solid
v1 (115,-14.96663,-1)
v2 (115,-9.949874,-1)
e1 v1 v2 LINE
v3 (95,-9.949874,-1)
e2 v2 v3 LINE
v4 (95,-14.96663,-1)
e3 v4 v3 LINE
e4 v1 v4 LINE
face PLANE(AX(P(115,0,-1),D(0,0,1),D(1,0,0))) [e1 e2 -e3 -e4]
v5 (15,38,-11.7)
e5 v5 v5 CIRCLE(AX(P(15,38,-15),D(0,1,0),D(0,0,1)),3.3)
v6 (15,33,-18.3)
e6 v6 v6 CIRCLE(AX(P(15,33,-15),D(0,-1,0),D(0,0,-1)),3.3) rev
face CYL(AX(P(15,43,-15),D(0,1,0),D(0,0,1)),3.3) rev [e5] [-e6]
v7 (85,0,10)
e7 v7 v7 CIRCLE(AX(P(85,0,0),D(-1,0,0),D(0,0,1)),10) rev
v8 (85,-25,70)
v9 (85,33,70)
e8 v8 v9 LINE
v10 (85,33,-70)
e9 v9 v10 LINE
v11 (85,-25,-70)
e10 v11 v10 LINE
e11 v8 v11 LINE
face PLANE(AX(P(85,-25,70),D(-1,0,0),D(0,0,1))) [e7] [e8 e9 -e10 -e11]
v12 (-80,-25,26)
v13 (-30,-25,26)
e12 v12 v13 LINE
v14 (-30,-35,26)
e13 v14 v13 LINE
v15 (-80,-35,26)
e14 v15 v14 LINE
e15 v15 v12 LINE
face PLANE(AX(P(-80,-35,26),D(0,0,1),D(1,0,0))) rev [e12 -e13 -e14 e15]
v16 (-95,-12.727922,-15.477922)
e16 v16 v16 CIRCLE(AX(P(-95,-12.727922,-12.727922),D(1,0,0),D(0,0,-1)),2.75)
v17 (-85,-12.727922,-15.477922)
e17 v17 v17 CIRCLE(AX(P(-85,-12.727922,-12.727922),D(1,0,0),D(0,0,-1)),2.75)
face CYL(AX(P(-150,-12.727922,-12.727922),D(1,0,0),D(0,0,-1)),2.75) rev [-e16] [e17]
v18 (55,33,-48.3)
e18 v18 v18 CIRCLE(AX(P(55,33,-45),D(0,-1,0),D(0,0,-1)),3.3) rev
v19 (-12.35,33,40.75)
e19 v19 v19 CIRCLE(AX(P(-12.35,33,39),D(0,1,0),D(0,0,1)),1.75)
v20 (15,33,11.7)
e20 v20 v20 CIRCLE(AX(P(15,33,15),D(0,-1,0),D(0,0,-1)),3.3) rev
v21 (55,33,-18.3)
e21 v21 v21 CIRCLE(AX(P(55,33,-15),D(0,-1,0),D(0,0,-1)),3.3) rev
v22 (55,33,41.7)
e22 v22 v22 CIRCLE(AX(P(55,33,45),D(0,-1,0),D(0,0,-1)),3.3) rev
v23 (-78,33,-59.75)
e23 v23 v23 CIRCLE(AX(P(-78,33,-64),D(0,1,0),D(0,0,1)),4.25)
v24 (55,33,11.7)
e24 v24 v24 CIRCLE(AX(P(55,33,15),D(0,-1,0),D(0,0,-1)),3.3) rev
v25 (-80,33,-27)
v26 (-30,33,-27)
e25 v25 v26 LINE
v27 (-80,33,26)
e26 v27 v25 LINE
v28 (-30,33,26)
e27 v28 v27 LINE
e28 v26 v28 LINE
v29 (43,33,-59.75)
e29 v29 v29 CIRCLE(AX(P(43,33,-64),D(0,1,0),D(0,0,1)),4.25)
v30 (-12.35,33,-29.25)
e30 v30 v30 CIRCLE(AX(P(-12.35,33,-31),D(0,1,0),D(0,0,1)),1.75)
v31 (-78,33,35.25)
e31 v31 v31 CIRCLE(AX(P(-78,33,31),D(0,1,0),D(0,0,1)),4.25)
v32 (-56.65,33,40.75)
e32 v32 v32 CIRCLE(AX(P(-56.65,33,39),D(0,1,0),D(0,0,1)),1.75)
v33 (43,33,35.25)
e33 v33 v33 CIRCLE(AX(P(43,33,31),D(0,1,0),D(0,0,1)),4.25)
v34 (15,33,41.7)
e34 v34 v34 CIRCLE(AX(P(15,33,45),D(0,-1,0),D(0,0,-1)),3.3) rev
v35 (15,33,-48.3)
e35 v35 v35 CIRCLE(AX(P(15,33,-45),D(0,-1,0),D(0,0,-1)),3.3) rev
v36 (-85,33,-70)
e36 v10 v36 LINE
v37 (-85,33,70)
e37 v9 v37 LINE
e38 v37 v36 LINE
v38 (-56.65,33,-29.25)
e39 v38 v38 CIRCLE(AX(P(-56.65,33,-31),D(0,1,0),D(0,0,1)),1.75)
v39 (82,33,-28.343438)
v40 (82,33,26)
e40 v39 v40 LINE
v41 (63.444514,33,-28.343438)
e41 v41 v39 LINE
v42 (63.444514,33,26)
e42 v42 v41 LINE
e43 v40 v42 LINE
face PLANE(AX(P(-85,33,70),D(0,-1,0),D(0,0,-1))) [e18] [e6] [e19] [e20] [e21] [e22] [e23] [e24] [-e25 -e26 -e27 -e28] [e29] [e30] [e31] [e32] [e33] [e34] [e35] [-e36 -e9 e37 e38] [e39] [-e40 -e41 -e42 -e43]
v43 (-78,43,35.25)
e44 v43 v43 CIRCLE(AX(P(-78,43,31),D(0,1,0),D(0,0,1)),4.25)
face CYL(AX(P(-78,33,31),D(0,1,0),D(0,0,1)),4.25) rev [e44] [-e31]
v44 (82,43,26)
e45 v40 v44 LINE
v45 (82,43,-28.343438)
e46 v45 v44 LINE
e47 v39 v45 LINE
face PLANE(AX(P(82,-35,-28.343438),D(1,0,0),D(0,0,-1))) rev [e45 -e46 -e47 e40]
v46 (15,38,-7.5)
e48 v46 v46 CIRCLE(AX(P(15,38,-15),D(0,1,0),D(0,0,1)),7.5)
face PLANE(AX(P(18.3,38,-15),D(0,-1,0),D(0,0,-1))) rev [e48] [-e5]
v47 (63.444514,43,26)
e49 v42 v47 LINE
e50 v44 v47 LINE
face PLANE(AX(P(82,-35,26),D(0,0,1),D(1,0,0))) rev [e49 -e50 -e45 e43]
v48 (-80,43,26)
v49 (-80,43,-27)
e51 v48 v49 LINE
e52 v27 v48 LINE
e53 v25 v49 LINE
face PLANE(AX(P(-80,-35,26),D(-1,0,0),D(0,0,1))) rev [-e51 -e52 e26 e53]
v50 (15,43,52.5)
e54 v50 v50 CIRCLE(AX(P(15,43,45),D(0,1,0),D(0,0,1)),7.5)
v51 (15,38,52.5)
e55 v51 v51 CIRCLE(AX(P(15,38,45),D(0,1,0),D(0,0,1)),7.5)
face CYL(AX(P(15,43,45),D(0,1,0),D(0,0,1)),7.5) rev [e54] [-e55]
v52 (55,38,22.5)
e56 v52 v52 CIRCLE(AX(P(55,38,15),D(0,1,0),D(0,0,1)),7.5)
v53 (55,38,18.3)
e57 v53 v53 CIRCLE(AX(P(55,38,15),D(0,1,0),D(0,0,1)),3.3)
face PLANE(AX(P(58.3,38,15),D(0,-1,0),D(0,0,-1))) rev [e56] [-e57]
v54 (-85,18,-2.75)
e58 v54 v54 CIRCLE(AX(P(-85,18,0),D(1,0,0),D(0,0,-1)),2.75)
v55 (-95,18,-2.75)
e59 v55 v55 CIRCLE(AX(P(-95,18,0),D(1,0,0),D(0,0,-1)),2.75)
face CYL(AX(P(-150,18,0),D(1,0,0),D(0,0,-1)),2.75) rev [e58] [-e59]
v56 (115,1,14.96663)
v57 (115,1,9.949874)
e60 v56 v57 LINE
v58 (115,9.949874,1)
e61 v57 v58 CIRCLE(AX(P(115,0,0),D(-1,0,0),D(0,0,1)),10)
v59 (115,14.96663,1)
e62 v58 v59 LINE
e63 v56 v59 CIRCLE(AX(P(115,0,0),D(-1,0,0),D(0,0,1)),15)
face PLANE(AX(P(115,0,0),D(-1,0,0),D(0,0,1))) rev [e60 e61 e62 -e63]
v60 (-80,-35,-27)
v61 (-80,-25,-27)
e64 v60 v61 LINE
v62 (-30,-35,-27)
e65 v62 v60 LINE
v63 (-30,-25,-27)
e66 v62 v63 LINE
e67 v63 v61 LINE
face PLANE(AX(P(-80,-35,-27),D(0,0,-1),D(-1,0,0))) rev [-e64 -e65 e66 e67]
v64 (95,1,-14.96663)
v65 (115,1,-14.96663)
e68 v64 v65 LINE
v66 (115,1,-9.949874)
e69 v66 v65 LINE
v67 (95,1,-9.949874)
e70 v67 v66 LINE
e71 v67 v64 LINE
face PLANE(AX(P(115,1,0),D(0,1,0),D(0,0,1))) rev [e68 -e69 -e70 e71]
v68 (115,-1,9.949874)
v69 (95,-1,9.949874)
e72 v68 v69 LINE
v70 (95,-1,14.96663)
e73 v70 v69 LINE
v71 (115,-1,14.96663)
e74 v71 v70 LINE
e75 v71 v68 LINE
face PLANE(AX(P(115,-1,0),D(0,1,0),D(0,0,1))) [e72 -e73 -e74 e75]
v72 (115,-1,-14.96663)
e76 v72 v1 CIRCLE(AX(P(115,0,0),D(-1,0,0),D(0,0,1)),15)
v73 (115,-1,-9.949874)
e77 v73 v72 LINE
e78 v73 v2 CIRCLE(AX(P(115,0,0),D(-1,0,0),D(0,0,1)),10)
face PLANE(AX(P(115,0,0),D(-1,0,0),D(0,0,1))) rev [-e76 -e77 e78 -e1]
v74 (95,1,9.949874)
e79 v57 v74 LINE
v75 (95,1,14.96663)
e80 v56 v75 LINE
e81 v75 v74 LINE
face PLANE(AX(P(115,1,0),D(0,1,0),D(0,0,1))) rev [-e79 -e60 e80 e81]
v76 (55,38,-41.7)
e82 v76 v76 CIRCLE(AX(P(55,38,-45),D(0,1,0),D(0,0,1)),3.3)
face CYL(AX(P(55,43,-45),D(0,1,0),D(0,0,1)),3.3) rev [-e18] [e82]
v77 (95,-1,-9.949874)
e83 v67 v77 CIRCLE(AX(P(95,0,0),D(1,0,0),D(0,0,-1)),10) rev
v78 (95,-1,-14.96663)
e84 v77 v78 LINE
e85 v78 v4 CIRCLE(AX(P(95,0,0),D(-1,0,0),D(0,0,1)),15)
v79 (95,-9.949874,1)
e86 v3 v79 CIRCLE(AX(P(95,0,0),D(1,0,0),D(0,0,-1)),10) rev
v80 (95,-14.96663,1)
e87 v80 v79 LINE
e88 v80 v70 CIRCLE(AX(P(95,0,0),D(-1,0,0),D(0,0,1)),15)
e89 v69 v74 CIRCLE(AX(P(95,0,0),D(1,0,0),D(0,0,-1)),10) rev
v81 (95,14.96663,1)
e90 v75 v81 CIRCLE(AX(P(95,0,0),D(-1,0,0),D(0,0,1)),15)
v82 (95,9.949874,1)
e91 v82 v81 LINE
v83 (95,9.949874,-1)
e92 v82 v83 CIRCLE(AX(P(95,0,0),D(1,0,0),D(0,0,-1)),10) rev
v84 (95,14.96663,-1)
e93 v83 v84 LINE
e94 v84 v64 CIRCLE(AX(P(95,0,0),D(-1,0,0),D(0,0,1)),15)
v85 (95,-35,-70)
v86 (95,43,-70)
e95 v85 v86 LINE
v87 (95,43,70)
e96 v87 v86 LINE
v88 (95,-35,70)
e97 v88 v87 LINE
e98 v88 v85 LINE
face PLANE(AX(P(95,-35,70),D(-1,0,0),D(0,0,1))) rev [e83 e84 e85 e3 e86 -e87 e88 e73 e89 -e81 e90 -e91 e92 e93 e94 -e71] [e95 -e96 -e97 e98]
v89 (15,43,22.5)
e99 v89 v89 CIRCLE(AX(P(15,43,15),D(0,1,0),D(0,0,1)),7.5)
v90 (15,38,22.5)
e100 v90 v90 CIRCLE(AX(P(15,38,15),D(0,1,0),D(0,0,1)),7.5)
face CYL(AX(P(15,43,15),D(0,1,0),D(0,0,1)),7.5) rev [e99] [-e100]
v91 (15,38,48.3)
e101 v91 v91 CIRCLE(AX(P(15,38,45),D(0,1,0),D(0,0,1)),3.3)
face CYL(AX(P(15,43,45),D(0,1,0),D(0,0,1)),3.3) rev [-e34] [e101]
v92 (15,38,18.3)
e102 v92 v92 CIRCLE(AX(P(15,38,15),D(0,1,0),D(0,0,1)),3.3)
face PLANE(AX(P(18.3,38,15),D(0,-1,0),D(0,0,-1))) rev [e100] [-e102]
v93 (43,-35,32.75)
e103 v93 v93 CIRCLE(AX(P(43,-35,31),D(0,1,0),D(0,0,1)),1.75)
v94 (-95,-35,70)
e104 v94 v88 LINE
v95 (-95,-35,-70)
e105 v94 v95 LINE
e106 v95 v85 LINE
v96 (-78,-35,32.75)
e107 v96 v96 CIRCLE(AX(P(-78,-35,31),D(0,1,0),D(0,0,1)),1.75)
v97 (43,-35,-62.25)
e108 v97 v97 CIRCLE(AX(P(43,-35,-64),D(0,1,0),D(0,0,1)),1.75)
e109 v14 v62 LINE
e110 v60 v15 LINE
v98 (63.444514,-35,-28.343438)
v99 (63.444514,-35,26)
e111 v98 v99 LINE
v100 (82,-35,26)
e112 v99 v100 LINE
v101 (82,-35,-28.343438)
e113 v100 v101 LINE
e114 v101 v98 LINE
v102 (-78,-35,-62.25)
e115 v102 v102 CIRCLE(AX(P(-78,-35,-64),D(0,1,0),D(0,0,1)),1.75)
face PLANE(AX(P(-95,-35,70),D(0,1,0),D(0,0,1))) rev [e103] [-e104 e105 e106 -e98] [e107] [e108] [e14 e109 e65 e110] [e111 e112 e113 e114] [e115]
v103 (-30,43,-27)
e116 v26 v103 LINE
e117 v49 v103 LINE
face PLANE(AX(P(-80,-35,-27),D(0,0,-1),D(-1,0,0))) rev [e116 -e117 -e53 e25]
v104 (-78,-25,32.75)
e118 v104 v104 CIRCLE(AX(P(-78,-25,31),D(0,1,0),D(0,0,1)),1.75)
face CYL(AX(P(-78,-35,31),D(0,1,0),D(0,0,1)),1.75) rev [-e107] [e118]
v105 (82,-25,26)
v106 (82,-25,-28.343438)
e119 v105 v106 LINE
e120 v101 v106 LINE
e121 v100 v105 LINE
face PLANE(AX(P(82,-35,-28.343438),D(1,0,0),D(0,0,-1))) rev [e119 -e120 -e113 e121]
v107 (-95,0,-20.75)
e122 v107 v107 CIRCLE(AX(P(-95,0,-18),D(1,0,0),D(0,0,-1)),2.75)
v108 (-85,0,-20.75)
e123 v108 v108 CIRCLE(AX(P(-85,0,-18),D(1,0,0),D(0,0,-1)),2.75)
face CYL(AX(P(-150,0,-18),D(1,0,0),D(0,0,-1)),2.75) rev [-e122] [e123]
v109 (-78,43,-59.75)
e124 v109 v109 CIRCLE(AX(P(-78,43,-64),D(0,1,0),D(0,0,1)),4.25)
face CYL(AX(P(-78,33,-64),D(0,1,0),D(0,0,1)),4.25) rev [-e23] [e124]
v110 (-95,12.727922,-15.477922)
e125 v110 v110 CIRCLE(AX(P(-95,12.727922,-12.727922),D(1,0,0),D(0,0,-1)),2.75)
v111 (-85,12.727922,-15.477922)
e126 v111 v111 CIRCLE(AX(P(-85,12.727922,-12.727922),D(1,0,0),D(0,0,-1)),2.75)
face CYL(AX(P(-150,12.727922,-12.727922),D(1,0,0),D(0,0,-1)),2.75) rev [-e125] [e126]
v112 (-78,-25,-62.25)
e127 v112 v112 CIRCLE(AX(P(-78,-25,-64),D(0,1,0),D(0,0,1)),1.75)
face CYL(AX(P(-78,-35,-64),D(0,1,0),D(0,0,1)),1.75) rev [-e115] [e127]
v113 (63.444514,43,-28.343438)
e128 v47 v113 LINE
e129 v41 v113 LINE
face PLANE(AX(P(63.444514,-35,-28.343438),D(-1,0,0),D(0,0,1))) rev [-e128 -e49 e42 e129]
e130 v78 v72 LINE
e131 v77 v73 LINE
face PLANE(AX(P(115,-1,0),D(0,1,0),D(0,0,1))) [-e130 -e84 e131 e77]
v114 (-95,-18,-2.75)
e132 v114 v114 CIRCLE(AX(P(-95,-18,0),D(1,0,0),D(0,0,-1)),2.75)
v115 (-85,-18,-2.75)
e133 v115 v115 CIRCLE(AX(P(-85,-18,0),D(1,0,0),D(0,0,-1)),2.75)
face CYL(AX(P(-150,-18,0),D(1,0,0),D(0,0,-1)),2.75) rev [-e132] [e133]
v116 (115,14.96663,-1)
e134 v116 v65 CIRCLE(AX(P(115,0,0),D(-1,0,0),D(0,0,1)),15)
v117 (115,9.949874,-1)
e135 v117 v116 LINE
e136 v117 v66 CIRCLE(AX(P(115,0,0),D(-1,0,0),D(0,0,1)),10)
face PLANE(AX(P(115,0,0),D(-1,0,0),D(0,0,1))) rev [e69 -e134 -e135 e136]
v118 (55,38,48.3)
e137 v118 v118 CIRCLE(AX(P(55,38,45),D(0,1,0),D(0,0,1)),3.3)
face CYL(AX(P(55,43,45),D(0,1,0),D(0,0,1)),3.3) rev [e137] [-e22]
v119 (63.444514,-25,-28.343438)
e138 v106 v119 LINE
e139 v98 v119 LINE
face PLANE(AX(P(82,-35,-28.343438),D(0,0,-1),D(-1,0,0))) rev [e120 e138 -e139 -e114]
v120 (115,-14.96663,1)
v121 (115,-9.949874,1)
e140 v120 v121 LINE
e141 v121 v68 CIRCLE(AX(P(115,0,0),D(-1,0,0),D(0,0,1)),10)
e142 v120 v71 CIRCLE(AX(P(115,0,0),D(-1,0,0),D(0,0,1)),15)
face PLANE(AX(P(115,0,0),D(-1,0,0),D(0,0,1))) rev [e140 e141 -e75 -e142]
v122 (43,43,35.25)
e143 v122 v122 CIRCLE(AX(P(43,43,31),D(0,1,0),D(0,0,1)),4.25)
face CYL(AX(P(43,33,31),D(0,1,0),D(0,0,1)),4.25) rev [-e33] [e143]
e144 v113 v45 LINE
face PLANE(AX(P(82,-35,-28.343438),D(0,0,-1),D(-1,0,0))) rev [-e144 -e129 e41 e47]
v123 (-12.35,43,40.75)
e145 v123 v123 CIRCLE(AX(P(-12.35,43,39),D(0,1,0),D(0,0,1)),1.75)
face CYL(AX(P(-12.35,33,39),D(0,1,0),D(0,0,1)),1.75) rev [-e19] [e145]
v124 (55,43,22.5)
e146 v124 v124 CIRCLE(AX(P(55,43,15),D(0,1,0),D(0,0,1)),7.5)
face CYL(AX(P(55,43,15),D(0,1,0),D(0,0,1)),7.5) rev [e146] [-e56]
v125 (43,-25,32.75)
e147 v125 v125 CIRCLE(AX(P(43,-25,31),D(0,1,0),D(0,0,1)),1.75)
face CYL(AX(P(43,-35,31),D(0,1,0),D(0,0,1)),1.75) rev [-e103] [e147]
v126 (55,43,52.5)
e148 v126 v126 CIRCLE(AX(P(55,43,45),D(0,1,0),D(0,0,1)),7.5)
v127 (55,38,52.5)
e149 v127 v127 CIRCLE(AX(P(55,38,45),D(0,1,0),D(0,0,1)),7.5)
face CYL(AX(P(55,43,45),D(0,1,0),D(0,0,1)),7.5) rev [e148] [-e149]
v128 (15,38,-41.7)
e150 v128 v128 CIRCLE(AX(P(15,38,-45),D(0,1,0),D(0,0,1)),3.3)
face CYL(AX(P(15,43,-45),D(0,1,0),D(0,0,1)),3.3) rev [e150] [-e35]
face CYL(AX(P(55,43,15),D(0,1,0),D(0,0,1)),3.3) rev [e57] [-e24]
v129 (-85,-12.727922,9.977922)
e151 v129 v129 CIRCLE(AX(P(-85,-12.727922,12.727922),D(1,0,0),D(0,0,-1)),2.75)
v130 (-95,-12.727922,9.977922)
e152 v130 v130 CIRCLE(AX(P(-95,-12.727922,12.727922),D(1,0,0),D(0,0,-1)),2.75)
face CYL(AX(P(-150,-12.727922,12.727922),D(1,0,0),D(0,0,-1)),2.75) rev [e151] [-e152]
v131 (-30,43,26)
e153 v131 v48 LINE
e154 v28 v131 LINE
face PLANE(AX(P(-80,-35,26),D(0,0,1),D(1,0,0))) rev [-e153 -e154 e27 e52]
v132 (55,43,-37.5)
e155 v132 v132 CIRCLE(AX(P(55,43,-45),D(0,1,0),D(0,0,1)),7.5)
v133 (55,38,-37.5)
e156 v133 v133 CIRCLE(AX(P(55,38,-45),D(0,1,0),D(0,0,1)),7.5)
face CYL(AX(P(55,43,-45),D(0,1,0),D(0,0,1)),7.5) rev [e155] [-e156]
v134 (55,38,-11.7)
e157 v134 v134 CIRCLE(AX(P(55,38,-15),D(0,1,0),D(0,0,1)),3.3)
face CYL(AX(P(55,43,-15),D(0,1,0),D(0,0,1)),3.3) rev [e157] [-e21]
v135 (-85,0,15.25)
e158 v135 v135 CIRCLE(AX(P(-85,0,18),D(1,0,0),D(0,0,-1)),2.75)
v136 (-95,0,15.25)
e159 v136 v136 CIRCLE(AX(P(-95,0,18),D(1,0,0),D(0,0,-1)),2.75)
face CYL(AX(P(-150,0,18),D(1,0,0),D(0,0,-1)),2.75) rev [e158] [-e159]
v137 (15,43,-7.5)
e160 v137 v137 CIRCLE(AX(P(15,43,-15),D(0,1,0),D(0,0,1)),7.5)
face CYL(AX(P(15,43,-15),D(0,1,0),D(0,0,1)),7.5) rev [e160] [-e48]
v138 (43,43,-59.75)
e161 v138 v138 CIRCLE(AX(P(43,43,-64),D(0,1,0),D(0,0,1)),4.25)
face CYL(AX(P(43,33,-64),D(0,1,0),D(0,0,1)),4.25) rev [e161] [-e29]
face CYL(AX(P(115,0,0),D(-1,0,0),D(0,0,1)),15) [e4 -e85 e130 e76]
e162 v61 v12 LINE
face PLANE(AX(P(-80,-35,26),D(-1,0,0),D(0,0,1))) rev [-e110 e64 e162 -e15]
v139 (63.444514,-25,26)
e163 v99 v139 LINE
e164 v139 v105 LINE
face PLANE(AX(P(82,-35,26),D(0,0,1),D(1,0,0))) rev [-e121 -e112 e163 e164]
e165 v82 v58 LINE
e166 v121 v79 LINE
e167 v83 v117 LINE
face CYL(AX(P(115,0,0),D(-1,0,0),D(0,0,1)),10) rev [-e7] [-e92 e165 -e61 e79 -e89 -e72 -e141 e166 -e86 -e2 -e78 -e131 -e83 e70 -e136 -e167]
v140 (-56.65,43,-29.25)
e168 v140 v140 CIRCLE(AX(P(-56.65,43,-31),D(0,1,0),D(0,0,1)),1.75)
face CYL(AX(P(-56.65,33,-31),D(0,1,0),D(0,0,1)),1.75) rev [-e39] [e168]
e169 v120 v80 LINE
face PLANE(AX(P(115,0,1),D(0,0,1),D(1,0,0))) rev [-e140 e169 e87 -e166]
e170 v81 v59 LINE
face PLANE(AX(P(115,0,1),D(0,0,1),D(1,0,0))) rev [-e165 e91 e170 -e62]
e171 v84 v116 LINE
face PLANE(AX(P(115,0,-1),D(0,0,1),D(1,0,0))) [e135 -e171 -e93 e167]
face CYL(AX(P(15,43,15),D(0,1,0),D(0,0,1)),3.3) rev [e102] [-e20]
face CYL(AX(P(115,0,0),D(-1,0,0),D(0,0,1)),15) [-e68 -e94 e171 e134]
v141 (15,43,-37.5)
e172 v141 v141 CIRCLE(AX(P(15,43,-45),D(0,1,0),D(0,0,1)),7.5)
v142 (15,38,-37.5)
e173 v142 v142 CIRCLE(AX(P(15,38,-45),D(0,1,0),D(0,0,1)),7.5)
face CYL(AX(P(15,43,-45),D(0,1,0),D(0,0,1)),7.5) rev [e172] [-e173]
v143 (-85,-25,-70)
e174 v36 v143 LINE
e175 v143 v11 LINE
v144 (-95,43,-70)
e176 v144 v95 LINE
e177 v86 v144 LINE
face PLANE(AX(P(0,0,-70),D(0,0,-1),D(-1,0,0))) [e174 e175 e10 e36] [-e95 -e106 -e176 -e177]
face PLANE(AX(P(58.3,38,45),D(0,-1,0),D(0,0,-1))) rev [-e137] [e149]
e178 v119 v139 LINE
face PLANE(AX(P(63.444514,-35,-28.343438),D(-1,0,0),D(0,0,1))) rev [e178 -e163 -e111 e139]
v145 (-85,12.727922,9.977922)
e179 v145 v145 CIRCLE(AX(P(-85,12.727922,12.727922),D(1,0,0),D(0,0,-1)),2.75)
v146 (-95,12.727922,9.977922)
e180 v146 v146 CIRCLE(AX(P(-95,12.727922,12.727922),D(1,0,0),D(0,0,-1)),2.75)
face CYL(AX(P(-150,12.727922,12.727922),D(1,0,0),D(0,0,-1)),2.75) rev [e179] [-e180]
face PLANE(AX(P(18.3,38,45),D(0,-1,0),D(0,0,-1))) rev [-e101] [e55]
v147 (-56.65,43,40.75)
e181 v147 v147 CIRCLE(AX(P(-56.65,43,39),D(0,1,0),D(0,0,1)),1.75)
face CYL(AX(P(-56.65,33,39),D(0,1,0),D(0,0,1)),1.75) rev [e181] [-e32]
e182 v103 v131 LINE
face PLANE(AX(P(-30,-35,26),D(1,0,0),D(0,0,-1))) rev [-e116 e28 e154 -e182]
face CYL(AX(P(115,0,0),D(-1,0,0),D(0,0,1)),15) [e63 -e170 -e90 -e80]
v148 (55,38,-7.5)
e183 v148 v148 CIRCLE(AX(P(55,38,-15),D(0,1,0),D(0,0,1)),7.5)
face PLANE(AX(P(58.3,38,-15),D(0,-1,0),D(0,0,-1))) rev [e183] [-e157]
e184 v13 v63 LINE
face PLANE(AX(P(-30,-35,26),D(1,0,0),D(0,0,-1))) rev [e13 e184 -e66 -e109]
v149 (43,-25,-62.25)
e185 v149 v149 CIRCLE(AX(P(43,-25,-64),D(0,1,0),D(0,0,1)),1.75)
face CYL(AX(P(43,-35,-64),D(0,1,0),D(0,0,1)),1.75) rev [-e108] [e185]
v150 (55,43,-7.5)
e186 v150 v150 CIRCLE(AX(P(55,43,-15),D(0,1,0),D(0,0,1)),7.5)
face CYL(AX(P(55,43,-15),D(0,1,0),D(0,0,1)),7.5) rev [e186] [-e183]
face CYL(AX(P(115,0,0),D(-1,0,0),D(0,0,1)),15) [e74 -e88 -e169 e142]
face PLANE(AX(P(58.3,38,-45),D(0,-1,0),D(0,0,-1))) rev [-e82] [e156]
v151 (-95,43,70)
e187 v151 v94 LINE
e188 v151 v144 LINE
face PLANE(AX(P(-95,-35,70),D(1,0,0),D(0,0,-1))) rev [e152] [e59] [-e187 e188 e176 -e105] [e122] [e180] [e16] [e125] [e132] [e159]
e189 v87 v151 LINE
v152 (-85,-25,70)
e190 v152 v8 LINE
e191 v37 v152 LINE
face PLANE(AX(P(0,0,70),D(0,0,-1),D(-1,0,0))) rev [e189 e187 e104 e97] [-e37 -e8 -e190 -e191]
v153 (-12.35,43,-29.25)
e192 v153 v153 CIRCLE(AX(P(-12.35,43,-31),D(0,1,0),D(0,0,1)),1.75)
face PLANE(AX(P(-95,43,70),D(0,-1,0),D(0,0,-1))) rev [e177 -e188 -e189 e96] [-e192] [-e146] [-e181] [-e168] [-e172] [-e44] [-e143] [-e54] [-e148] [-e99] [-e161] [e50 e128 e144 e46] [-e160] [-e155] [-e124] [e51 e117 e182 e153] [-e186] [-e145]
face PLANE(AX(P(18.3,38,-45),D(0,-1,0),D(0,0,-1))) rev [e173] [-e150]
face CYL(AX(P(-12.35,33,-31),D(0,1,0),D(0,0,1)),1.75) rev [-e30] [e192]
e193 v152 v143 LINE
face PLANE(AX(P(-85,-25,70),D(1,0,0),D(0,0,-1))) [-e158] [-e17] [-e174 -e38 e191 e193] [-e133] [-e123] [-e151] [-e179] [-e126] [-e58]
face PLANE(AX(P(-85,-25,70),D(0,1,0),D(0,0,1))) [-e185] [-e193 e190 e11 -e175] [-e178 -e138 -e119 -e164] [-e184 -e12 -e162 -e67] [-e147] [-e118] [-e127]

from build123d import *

# Parameters (mm, degrees)
SKETCH1_W                                 = 190
SKETCH1_H                                 = 78
SKETCH1_W_2                               = 170
SKETCH1_H_2                               = 58
BOSS_EXTRUDE1_DEPTH                       = 70
BOSS_EXTRUDE2_START                       = 95
SKETCH2_R                                 = 15
SKETCH2_R_2                               = 10
BOSS_EXTRUDE2_DEPTH                       = 20
SKETCH3_R                                 = 10
CUT_EXTRUDE1_DEPTH                        = 150
SKETCH4_R                                 = 2.75
CUT_EXTRUDE2_DEPTH                        = 150
CUT_EXTRUDE3_DEPTH                        = 208
SKETCH7_R                                 = 3.25
CUT_EXTRUDE4_DEPTH                        = 26
CBORE_START                               = 38
CBORE_FOR_M5_HEX_HEAD_BOLT1_OUTLINE_R     = 7.5
CBORE_FOR_M5_HEX_HEAD_BOLT1_OUTLINE_R_2   = 3.25
CBORE_FOR_M5_HEX_HEAD_BOLT1_DEPTH         = 5
CBORE_START_2                             = 33
CBORE_FOR_M5_HEX_HEAD_BOLT1_2_OUTLINE_R   = 3.3
CBORE_FOR_M5_HEX_HEAD_BOLT1_2_OUTLINE_R_2 = 3.25
CBORE_FOR_M5_HEX_HEAD_BOLT1_2_DEPTH       = 5
CUT_EXTRUDE5_DEPTH                        = 156.592416268
CUT_EXTRUDE5_DEPTH_BACK                   = 156.592416268
SKETCH10_W                                = 50
SKETCH10_H                                = 53
SKETCH10_W_2                              = 18.555485725
SKETCH10_H_2                              = 54.34343807
SKETCH11_R                                = 1.75
SKETCH11_R_2                              = 4.25
CUT_EXTRUDE6_DEPTH                        = 10
SKETCH12_R                                = 1.75
CUT_EXTRUDE7_DEPTH                        = 10


# Read off the part's stored shape, not the designer's step: CBORE for M5 Hex Head Bolt1
with BuildPart() as part:
    # Sketch1 → Boss-Extrude1 (new, symmetric)
    with BuildSketch(Plane.XY):
        with Locations((0, 4)):
            Rectangle(SKETCH1_W, SKETCH1_H)
        with Locations((0, 4)):
            Rectangle(SKETCH1_W_2, SKETCH1_H_2, mode=Mode.SUBTRACT)
    extrude(amount=BOSS_EXTRUDE1_DEPTH, both=True)

    # Sketch2 → Boss-Extrude2 (add)
    with BuildSketch(Plane(origin=(0, 0, 0), x_dir=(0, 0, -1), z_dir=(1, 0, 0)).offset(BOSS_EXTRUDE2_START)):
        with Locations(Location((0, 0, 0), (0, 0, 180))):
            Circle(SKETCH2_R)
        with Locations(Location((0, 0, 0), (0, 0, 180))):
            Circle(SKETCH2_R_2, mode=Mode.SUBTRACT)
    extrude(amount=BOSS_EXTRUDE2_DEPTH)

    # Sketch3 → Cut-Extrude1 (cut)
    with BuildSketch(Plane(origin=(0, 0, 0), x_dir=(0, 0, -1), z_dir=(1, 0, 0))):
        with Locations(Location((0, 0, 0), (0, 0, 180))):
            Circle(SKETCH3_R)
    extrude(amount=CUT_EXTRUDE1_DEPTH, mode=Mode.SUBTRACT)

    # Sketch4 → Cut-Extrude2 (cut)
    with BuildSketch(Plane(origin=(0, 0, 0), x_dir=(0, 0, -1), z_dir=(1, 0, 0))):
        with Locations((0, 18)):
            Circle(SKETCH4_R)
        with Locations((12.727922061, 12.727922061)):
            Circle(SKETCH4_R)
        with Locations((18, 0)):
            Circle(SKETCH4_R)
        with Locations((12.727922061, -12.727922061)):
            Circle(SKETCH4_R)
        with Locations((0, -18)):
            Circle(SKETCH4_R)
        with Locations((-12.727922061, -12.727922061)):
            Circle(SKETCH4_R)
        with Locations((-18, 0)):
            Circle(SKETCH4_R)
        with Locations((-12.727922061, 12.727922061)):
            Circle(SKETCH4_R)
    extrude(amount=-CUT_EXTRUDE2_DEPTH, mode=Mode.SUBTRACT)

    # Sketch5 → Cut-Extrude3 (cut, through all)
    with BuildSketch(Plane(origin=(95, 0, 0), x_dir=(0, 0, -1), z_dir=(1, 0, 0))):
        with BuildLine():
            ThreePointArc((15, 0), (14.991655066, -0.500278319), (14.966629547, -1))
            Line((14.966629547, -1), (20.919422727, -1))
            Line((20.919422727, -1), (20.919422727, 1))
            Line((20.919422727, 1), (14.966629547, 1))
            ThreePointArc((14.966629547, 1), (14.991655066, 0.500278319), (15, 0))
        make_face()
        with BuildLine():
            ThreePointArc((-14.966629547, 1), (-15, 0), (-14.966629547, -1))
            Line((-14.966629547, -1), (-1, -1))
            Line((-1, -1), (-1, 1))
            Line((-1, 1), (-14.966629547, 1))
        make_face()
        with BuildLine():
            Line((1, -1), (-1, -1))
            Line((-1, -1), (-1, -14.966629547))
            ThreePointArc((-1, -14.966629547), (0, -15), (1, -14.966629547))
            Line((1, -14.966629547), (1, -1))
        make_face()
        with BuildLine():
            Line((-1, 14.966629547), (-1, 1))
            Line((-1, 1), (1, 1))
            Line((1, 1), (1, 14.966629547))
            ThreePointArc((1, 14.966629547), (0, 15), (-1, 14.966629547))
        make_face()
        with BuildLine():
            Line((1, 1), (1, -1))
            Line((1, -1), (14.966629547, -1))
            ThreePointArc((14.966629547, -1), (14.991655066, -0.500278319), (15, 0))
            ThreePointArc((15, 0), (14.991655066, 0.500278319), (14.966629547, 1))
            Line((14.966629547, 1), (1, 1))
        make_face()
        with BuildLine():
            ThreePointArc((1, -14.966629547), (0, -15), (-1, -14.966629547))
            Line((-1, -14.966629547), (-1, -18.179329237))
            Line((-1, -18.179329237), (1, -18.179329237))
            Line((1, -18.179329237), (1, -14.966629547))
        make_face()
        with BuildLine():
            Line((-20.919422727, 1), (-20.919422727, -1))
            Line((-20.919422727, -1), (-14.966629547, -1))
            ThreePointArc((-14.966629547, -1), (-15, 0), (-14.966629547, 1))
            Line((-14.966629547, 1), (-20.919422727, 1))
        make_face()
        with BuildLine():
            Line((-1, 18.179329237), (-1, 14.966629547))
            ThreePointArc((-1, 14.966629547), (0, 15), (1, 14.966629547))
            Line((1, 14.966629547), (1, 18.179329237))
            Line((1, 18.179329237), (-1, 18.179329237))
        make_face()
    extrude(amount=CUT_EXTRUDE3_DEPTH, mode=Mode.SUBTRACT)

    # Sketch7 → Cut-Extrude4 (cut)
    with BuildSketch(Plane(origin=(0, 43, 0), x_dir=(1, 0, 0), z_dir=(0, 1, 0))):
        with Locations(Location((15, -45, 0), (0, 0, 270))):
            Circle(SKETCH7_R)
        with Locations(Location((55, -45, 0), (0, 0, 270))):
            Circle(SKETCH7_R)
        with Locations(Location((15, -15, 0), (0, 0, 270))):
            Circle(SKETCH7_R)
        with Locations(Location((55, -15, 0), (0, 0, 270))):
            Circle(SKETCH7_R)
        with Locations(Location((15, 15, 0), (0, 0, 270))):
            Circle(SKETCH7_R)
        with Locations(Location((55, 15, 0), (0, 0, 270))):
            Circle(SKETCH7_R)
        with Locations(Location((15, 45, 0), (0, 0, 270))):
            Circle(SKETCH7_R)
        with Locations(Location((55, 45, 0), (0, 0, 270))):
            Circle(SKETCH7_R)
    extrude(amount=-CUT_EXTRUDE4_DEPTH, mode=Mode.SUBTRACT)

    # CBORE for M5 Hex Head Bolt1 outline → CBORE for M5 Hex Head Bolt1 (cut)
    # profile 1 of 8: a face of its own
    with BuildSketch(Plane(origin=(0, 0, 0), x_dir=(1, 0, 0), z_dir=(0, 1, 0)).offset(CBORE_START)):
        with Locations((15, -15)):
            Circle(CBORE_FOR_M5_HEX_HEAD_BOLT1_OUTLINE_R)
        with Locations((15, -15)):
            Circle(CBORE_FOR_M5_HEX_HEAD_BOLT1_OUTLINE_R_2, mode=Mode.SUBTRACT)
    # profile 2 of 8: a face of its own
    with BuildSketch(Plane(origin=(0, 0, 0), x_dir=(1, 0, 0), z_dir=(0, 1, 0)).offset(CBORE_START)):
        with Locations((15, -45)):
            Circle(CBORE_FOR_M5_HEX_HEAD_BOLT1_OUTLINE_R)
        with Locations((15, -45)):
            Circle(CBORE_FOR_M5_HEX_HEAD_BOLT1_OUTLINE_R_2, mode=Mode.SUBTRACT)
    # profile 3 of 8: a face of its own
    with BuildSketch(Plane(origin=(0, 0, 0), x_dir=(1, 0, 0), z_dir=(0, 1, 0)).offset(CBORE_START)):
        with Locations((55, -45)):
            Circle(CBORE_FOR_M5_HEX_HEAD_BOLT1_OUTLINE_R)
        with Locations((55, -45)):
            Circle(CBORE_FOR_M5_HEX_HEAD_BOLT1_OUTLINE_R_2, mode=Mode.SUBTRACT)
    # profile 4 of 8: a face of its own
    with BuildSketch(Plane(origin=(0, 0, 0), x_dir=(1, 0, 0), z_dir=(0, 1, 0)).offset(CBORE_START)):
        with Locations((55, -15)):
            Circle(CBORE_FOR_M5_HEX_HEAD_BOLT1_OUTLINE_R)
        with Locations((55, -15)):
            Circle(CBORE_FOR_M5_HEX_HEAD_BOLT1_OUTLINE_R_2, mode=Mode.SUBTRACT)
    # profile 5 of 8: a face of its own
    with BuildSketch(Plane(origin=(0, 0, 0), x_dir=(1, 0, 0), z_dir=(0, 1, 0)).offset(CBORE_START)):
        with Locations((15, 15)):
            Circle(CBORE_FOR_M5_HEX_HEAD_BOLT1_OUTLINE_R)
        with Locations((15, 15)):
            Circle(CBORE_FOR_M5_HEX_HEAD_BOLT1_OUTLINE_R_2, mode=Mode.SUBTRACT)
    # profile 6 of 8: a face of its own
    with BuildSketch(Plane(origin=(0, 0, 0), x_dir=(1, 0, 0), z_dir=(0, 1, 0)).offset(CBORE_START)):
        with Locations((55, 15)):
            Circle(CBORE_FOR_M5_HEX_HEAD_BOLT1_OUTLINE_R)
        with Locations((55, 15)):
            Circle(CBORE_FOR_M5_HEX_HEAD_BOLT1_OUTLINE_R_2, mode=Mode.SUBTRACT)
    # profile 7 of 8: a face of its own
    with BuildSketch(Plane(origin=(0, 0, 0), x_dir=(1, 0, 0), z_dir=(0, 1, 0)).offset(CBORE_START)):
        with Locations((55, 45)):
            Circle(CBORE_FOR_M5_HEX_HEAD_BOLT1_OUTLINE_R)
        with Locations((55, 45)):
            Circle(CBORE_FOR_M5_HEX_HEAD_BOLT1_OUTLINE_R_2, mode=Mode.SUBTRACT)
    # profile 8 of 8: a face of its own
    with BuildSketch(Plane(origin=(0, 0, 0), x_dir=(1, 0, 0), z_dir=(0, 1, 0)).offset(CBORE_START)):
        with Locations((15, 45)):
            Circle(CBORE_FOR_M5_HEX_HEAD_BOLT1_OUTLINE_R)
        with Locations((15, 45)):
            Circle(CBORE_FOR_M5_HEX_HEAD_BOLT1_OUTLINE_R_2, mode=Mode.SUBTRACT)
    extrude(amount=CBORE_FOR_M5_HEX_HEAD_BOLT1_DEPTH, mode=Mode.SUBTRACT)

    # CBORE for M5 Hex Head Bolt1 2 outline → CBORE for M5 Hex Head Bolt1 2 (cut)
    # profile 1 of 8: a face of its own
    with BuildSketch(Plane(origin=(0, 0, 0), x_dir=(1, 0, 0), z_dir=(0, 1, 0)).offset(CBORE_START_2)):
        with Locations((15, -15)):
            Circle(CBORE_FOR_M5_HEX_HEAD_BOLT1_2_OUTLINE_R)
        with Locations((15, -15)):
            Circle(CBORE_FOR_M5_HEX_HEAD_BOLT1_2_OUTLINE_R_2, mode=Mode.SUBTRACT)
    # profile 2 of 8: a face of its own
    with BuildSketch(Plane(origin=(0, 0, 0), x_dir=(1, 0, 0), z_dir=(0, 1, 0)).offset(CBORE_START_2)):
        with Locations((15, -45)):
            Circle(CBORE_FOR_M5_HEX_HEAD_BOLT1_2_OUTLINE_R)
        with Locations((15, -45)):
            Circle(CBORE_FOR_M5_HEX_HEAD_BOLT1_2_OUTLINE_R_2, mode=Mode.SUBTRACT)
    # profile 3 of 8: a face of its own
    with BuildSketch(Plane(origin=(0, 0, 0), x_dir=(1, 0, 0), z_dir=(0, 1, 0)).offset(CBORE_START_2)):
        with Locations((55, -45)):
            Circle(CBORE_FOR_M5_HEX_HEAD_BOLT1_2_OUTLINE_R)
        with Locations((55, -45)):
            Circle(CBORE_FOR_M5_HEX_HEAD_BOLT1_2_OUTLINE_R_2, mode=Mode.SUBTRACT)
    # profile 4 of 8: a face of its own
    with BuildSketch(Plane(origin=(0, 0, 0), x_dir=(1, 0, 0), z_dir=(0, 1, 0)).offset(CBORE_START_2)):
        with Locations((55, -15)):
            Circle(CBORE_FOR_M5_HEX_HEAD_BOLT1_2_OUTLINE_R)
        with Locations((55, -15)):
            Circle(CBORE_FOR_M5_HEX_HEAD_BOLT1_2_OUTLINE_R_2, mode=Mode.SUBTRACT)
    # profile 5 of 8: a face of its own
    with BuildSketch(Plane(origin=(0, 0, 0), x_dir=(1, 0, 0), z_dir=(0, 1, 0)).offset(CBORE_START_2)):
        with Locations((15, 15)):
            Circle(CBORE_FOR_M5_HEX_HEAD_BOLT1_2_OUTLINE_R)
        with Locations((15, 15)):
            Circle(CBORE_FOR_M5_HEX_HEAD_BOLT1_2_OUTLINE_R_2, mode=Mode.SUBTRACT)
    # profile 6 of 8: a face of its own
    with BuildSketch(Plane(origin=(0, 0, 0), x_dir=(1, 0, 0), z_dir=(0, 1, 0)).offset(CBORE_START_2)):
        with Locations((55, 15)):
            Circle(CBORE_FOR_M5_HEX_HEAD_BOLT1_2_OUTLINE_R)
        with Locations((55, 15)):
            Circle(CBORE_FOR_M5_HEX_HEAD_BOLT1_2_OUTLINE_R_2, mode=Mode.SUBTRACT)
    # profile 7 of 8: a face of its own
    with BuildSketch(Plane(origin=(0, 0, 0), x_dir=(1, 0, 0), z_dir=(0, 1, 0)).offset(CBORE_START_2)):
        with Locations((55, 45)):
            Circle(CBORE_FOR_M5_HEX_HEAD_BOLT1_2_OUTLINE_R)
        with Locations((55, 45)):
            Circle(CBORE_FOR_M5_HEX_HEAD_BOLT1_2_OUTLINE_R_2, mode=Mode.SUBTRACT)
    # profile 8 of 8: a face of its own
    with BuildSketch(Plane(origin=(0, 0, 0), x_dir=(1, 0, 0), z_dir=(0, 1, 0)).offset(CBORE_START_2)):
        with Locations((15, 45)):
            Circle(CBORE_FOR_M5_HEX_HEAD_BOLT1_2_OUTLINE_R)
        with Locations((15, 45)):
            Circle(CBORE_FOR_M5_HEX_HEAD_BOLT1_2_OUTLINE_R_2, mode=Mode.SUBTRACT)
    extrude(amount=CBORE_FOR_M5_HEX_HEAD_BOLT1_2_DEPTH, mode=Mode.SUBTRACT)

    # Sketch10 → Cut-Extrude5 (cut, two sides: drawn at the far end of the back side and taken through both)
    with BuildSketch(Plane(origin=(0, 43, 0), x_dir=(1, 0, 0), z_dir=(0, 1, 0)).offset(-CUT_EXTRUDE5_DEPTH_BACK)):
        with Locations((-55, 0.5)):
            Rectangle(SKETCH10_W, SKETCH10_H)
        with Locations((72.722257138, 1.171719035)):
            Rectangle(SKETCH10_W_2, SKETCH10_H_2)
    extrude(amount=CUT_EXTRUDE5_DEPTH + CUT_EXTRUDE5_DEPTH_BACK, mode=Mode.SUBTRACT)

    # Sketch11 → Cut-Extrude6 (cut)
    with BuildSketch(Plane(origin=(-16, 43, 1.161504527), x_dir=(0.6870356995717798, 0, -0.7266236629190624), z_dir=(0, 1, 0))):
        with Locations(Location((-55.422347368, 3.54085469, 0), (0, 0, 223.395914439))):
            Circle(SKETCH11_R)
        with Locations(Location((-24.986665877, -28.648573578, 0), (0, 0, 223.395914439))):
            Circle(SKETCH11_R)
        with Locations(Location((25.876990528, 19.443925392, 0), (0, 0, 223.395914439))):
            Circle(SKETCH11_R)
        with Locations(Location((-4.558690963, 51.63335366, 0), (0, 0, 223.395914439))):
            Circle(SKETCH11_R)
        with Locations(Location((4.751677727, 89.818946949, 0), (0, 0, 223.395914439))):
            Circle(SKETCH11_R_2)
        with Locations(Location((87.882997375, 1.897483736, 0), (0, 0, 223.395914439))):
            Circle(SKETCH11_R_2)
        with Locations(Location((18.853749398, -63.370907724, 0), (0, 0, 223.395914439))):
            Circle(SKETCH11_R_2)
        with Locations(Location((-64.27757025, 24.550555489, 0), (0, 0, 223.395914439))):
            Circle(SKETCH11_R_2)
    extrude(amount=-CUT_EXTRUDE6_DEPTH, mode=Mode.SUBTRACT)

    # Sketch12 → Cut-Extrude7 (cut)
    with BuildSketch(Plane(origin=(-16, -25, 1.161504527), x_dir=(0.6870356995717798, 0, -0.7266236629190624), z_dir=(0, 1, 0))):
        with Locations(Location((18.853749398, -63.370907724, 0), (0, 0, 223.395914439))):
            Circle(SKETCH12_R)
        with Locations(Location((-64.27757025, 24.550555489, 0), (0, 0, 223.395914439))):
            Circle(SKETCH12_R)
        with Locations(Location((4.751677727, 89.818946949, 0), (0, 0, 223.395914439))):
            Circle(SKETCH12_R)
        with Locations(Location((87.882997375, 1.897483736, 0), (0, 0, 223.395914439))):
            Circle(SKETCH12_R)
    extrude(amount=-CUT_EXTRUDE7_DEPTH, mode=Mode.SUBTRACT)


solid = part.part
